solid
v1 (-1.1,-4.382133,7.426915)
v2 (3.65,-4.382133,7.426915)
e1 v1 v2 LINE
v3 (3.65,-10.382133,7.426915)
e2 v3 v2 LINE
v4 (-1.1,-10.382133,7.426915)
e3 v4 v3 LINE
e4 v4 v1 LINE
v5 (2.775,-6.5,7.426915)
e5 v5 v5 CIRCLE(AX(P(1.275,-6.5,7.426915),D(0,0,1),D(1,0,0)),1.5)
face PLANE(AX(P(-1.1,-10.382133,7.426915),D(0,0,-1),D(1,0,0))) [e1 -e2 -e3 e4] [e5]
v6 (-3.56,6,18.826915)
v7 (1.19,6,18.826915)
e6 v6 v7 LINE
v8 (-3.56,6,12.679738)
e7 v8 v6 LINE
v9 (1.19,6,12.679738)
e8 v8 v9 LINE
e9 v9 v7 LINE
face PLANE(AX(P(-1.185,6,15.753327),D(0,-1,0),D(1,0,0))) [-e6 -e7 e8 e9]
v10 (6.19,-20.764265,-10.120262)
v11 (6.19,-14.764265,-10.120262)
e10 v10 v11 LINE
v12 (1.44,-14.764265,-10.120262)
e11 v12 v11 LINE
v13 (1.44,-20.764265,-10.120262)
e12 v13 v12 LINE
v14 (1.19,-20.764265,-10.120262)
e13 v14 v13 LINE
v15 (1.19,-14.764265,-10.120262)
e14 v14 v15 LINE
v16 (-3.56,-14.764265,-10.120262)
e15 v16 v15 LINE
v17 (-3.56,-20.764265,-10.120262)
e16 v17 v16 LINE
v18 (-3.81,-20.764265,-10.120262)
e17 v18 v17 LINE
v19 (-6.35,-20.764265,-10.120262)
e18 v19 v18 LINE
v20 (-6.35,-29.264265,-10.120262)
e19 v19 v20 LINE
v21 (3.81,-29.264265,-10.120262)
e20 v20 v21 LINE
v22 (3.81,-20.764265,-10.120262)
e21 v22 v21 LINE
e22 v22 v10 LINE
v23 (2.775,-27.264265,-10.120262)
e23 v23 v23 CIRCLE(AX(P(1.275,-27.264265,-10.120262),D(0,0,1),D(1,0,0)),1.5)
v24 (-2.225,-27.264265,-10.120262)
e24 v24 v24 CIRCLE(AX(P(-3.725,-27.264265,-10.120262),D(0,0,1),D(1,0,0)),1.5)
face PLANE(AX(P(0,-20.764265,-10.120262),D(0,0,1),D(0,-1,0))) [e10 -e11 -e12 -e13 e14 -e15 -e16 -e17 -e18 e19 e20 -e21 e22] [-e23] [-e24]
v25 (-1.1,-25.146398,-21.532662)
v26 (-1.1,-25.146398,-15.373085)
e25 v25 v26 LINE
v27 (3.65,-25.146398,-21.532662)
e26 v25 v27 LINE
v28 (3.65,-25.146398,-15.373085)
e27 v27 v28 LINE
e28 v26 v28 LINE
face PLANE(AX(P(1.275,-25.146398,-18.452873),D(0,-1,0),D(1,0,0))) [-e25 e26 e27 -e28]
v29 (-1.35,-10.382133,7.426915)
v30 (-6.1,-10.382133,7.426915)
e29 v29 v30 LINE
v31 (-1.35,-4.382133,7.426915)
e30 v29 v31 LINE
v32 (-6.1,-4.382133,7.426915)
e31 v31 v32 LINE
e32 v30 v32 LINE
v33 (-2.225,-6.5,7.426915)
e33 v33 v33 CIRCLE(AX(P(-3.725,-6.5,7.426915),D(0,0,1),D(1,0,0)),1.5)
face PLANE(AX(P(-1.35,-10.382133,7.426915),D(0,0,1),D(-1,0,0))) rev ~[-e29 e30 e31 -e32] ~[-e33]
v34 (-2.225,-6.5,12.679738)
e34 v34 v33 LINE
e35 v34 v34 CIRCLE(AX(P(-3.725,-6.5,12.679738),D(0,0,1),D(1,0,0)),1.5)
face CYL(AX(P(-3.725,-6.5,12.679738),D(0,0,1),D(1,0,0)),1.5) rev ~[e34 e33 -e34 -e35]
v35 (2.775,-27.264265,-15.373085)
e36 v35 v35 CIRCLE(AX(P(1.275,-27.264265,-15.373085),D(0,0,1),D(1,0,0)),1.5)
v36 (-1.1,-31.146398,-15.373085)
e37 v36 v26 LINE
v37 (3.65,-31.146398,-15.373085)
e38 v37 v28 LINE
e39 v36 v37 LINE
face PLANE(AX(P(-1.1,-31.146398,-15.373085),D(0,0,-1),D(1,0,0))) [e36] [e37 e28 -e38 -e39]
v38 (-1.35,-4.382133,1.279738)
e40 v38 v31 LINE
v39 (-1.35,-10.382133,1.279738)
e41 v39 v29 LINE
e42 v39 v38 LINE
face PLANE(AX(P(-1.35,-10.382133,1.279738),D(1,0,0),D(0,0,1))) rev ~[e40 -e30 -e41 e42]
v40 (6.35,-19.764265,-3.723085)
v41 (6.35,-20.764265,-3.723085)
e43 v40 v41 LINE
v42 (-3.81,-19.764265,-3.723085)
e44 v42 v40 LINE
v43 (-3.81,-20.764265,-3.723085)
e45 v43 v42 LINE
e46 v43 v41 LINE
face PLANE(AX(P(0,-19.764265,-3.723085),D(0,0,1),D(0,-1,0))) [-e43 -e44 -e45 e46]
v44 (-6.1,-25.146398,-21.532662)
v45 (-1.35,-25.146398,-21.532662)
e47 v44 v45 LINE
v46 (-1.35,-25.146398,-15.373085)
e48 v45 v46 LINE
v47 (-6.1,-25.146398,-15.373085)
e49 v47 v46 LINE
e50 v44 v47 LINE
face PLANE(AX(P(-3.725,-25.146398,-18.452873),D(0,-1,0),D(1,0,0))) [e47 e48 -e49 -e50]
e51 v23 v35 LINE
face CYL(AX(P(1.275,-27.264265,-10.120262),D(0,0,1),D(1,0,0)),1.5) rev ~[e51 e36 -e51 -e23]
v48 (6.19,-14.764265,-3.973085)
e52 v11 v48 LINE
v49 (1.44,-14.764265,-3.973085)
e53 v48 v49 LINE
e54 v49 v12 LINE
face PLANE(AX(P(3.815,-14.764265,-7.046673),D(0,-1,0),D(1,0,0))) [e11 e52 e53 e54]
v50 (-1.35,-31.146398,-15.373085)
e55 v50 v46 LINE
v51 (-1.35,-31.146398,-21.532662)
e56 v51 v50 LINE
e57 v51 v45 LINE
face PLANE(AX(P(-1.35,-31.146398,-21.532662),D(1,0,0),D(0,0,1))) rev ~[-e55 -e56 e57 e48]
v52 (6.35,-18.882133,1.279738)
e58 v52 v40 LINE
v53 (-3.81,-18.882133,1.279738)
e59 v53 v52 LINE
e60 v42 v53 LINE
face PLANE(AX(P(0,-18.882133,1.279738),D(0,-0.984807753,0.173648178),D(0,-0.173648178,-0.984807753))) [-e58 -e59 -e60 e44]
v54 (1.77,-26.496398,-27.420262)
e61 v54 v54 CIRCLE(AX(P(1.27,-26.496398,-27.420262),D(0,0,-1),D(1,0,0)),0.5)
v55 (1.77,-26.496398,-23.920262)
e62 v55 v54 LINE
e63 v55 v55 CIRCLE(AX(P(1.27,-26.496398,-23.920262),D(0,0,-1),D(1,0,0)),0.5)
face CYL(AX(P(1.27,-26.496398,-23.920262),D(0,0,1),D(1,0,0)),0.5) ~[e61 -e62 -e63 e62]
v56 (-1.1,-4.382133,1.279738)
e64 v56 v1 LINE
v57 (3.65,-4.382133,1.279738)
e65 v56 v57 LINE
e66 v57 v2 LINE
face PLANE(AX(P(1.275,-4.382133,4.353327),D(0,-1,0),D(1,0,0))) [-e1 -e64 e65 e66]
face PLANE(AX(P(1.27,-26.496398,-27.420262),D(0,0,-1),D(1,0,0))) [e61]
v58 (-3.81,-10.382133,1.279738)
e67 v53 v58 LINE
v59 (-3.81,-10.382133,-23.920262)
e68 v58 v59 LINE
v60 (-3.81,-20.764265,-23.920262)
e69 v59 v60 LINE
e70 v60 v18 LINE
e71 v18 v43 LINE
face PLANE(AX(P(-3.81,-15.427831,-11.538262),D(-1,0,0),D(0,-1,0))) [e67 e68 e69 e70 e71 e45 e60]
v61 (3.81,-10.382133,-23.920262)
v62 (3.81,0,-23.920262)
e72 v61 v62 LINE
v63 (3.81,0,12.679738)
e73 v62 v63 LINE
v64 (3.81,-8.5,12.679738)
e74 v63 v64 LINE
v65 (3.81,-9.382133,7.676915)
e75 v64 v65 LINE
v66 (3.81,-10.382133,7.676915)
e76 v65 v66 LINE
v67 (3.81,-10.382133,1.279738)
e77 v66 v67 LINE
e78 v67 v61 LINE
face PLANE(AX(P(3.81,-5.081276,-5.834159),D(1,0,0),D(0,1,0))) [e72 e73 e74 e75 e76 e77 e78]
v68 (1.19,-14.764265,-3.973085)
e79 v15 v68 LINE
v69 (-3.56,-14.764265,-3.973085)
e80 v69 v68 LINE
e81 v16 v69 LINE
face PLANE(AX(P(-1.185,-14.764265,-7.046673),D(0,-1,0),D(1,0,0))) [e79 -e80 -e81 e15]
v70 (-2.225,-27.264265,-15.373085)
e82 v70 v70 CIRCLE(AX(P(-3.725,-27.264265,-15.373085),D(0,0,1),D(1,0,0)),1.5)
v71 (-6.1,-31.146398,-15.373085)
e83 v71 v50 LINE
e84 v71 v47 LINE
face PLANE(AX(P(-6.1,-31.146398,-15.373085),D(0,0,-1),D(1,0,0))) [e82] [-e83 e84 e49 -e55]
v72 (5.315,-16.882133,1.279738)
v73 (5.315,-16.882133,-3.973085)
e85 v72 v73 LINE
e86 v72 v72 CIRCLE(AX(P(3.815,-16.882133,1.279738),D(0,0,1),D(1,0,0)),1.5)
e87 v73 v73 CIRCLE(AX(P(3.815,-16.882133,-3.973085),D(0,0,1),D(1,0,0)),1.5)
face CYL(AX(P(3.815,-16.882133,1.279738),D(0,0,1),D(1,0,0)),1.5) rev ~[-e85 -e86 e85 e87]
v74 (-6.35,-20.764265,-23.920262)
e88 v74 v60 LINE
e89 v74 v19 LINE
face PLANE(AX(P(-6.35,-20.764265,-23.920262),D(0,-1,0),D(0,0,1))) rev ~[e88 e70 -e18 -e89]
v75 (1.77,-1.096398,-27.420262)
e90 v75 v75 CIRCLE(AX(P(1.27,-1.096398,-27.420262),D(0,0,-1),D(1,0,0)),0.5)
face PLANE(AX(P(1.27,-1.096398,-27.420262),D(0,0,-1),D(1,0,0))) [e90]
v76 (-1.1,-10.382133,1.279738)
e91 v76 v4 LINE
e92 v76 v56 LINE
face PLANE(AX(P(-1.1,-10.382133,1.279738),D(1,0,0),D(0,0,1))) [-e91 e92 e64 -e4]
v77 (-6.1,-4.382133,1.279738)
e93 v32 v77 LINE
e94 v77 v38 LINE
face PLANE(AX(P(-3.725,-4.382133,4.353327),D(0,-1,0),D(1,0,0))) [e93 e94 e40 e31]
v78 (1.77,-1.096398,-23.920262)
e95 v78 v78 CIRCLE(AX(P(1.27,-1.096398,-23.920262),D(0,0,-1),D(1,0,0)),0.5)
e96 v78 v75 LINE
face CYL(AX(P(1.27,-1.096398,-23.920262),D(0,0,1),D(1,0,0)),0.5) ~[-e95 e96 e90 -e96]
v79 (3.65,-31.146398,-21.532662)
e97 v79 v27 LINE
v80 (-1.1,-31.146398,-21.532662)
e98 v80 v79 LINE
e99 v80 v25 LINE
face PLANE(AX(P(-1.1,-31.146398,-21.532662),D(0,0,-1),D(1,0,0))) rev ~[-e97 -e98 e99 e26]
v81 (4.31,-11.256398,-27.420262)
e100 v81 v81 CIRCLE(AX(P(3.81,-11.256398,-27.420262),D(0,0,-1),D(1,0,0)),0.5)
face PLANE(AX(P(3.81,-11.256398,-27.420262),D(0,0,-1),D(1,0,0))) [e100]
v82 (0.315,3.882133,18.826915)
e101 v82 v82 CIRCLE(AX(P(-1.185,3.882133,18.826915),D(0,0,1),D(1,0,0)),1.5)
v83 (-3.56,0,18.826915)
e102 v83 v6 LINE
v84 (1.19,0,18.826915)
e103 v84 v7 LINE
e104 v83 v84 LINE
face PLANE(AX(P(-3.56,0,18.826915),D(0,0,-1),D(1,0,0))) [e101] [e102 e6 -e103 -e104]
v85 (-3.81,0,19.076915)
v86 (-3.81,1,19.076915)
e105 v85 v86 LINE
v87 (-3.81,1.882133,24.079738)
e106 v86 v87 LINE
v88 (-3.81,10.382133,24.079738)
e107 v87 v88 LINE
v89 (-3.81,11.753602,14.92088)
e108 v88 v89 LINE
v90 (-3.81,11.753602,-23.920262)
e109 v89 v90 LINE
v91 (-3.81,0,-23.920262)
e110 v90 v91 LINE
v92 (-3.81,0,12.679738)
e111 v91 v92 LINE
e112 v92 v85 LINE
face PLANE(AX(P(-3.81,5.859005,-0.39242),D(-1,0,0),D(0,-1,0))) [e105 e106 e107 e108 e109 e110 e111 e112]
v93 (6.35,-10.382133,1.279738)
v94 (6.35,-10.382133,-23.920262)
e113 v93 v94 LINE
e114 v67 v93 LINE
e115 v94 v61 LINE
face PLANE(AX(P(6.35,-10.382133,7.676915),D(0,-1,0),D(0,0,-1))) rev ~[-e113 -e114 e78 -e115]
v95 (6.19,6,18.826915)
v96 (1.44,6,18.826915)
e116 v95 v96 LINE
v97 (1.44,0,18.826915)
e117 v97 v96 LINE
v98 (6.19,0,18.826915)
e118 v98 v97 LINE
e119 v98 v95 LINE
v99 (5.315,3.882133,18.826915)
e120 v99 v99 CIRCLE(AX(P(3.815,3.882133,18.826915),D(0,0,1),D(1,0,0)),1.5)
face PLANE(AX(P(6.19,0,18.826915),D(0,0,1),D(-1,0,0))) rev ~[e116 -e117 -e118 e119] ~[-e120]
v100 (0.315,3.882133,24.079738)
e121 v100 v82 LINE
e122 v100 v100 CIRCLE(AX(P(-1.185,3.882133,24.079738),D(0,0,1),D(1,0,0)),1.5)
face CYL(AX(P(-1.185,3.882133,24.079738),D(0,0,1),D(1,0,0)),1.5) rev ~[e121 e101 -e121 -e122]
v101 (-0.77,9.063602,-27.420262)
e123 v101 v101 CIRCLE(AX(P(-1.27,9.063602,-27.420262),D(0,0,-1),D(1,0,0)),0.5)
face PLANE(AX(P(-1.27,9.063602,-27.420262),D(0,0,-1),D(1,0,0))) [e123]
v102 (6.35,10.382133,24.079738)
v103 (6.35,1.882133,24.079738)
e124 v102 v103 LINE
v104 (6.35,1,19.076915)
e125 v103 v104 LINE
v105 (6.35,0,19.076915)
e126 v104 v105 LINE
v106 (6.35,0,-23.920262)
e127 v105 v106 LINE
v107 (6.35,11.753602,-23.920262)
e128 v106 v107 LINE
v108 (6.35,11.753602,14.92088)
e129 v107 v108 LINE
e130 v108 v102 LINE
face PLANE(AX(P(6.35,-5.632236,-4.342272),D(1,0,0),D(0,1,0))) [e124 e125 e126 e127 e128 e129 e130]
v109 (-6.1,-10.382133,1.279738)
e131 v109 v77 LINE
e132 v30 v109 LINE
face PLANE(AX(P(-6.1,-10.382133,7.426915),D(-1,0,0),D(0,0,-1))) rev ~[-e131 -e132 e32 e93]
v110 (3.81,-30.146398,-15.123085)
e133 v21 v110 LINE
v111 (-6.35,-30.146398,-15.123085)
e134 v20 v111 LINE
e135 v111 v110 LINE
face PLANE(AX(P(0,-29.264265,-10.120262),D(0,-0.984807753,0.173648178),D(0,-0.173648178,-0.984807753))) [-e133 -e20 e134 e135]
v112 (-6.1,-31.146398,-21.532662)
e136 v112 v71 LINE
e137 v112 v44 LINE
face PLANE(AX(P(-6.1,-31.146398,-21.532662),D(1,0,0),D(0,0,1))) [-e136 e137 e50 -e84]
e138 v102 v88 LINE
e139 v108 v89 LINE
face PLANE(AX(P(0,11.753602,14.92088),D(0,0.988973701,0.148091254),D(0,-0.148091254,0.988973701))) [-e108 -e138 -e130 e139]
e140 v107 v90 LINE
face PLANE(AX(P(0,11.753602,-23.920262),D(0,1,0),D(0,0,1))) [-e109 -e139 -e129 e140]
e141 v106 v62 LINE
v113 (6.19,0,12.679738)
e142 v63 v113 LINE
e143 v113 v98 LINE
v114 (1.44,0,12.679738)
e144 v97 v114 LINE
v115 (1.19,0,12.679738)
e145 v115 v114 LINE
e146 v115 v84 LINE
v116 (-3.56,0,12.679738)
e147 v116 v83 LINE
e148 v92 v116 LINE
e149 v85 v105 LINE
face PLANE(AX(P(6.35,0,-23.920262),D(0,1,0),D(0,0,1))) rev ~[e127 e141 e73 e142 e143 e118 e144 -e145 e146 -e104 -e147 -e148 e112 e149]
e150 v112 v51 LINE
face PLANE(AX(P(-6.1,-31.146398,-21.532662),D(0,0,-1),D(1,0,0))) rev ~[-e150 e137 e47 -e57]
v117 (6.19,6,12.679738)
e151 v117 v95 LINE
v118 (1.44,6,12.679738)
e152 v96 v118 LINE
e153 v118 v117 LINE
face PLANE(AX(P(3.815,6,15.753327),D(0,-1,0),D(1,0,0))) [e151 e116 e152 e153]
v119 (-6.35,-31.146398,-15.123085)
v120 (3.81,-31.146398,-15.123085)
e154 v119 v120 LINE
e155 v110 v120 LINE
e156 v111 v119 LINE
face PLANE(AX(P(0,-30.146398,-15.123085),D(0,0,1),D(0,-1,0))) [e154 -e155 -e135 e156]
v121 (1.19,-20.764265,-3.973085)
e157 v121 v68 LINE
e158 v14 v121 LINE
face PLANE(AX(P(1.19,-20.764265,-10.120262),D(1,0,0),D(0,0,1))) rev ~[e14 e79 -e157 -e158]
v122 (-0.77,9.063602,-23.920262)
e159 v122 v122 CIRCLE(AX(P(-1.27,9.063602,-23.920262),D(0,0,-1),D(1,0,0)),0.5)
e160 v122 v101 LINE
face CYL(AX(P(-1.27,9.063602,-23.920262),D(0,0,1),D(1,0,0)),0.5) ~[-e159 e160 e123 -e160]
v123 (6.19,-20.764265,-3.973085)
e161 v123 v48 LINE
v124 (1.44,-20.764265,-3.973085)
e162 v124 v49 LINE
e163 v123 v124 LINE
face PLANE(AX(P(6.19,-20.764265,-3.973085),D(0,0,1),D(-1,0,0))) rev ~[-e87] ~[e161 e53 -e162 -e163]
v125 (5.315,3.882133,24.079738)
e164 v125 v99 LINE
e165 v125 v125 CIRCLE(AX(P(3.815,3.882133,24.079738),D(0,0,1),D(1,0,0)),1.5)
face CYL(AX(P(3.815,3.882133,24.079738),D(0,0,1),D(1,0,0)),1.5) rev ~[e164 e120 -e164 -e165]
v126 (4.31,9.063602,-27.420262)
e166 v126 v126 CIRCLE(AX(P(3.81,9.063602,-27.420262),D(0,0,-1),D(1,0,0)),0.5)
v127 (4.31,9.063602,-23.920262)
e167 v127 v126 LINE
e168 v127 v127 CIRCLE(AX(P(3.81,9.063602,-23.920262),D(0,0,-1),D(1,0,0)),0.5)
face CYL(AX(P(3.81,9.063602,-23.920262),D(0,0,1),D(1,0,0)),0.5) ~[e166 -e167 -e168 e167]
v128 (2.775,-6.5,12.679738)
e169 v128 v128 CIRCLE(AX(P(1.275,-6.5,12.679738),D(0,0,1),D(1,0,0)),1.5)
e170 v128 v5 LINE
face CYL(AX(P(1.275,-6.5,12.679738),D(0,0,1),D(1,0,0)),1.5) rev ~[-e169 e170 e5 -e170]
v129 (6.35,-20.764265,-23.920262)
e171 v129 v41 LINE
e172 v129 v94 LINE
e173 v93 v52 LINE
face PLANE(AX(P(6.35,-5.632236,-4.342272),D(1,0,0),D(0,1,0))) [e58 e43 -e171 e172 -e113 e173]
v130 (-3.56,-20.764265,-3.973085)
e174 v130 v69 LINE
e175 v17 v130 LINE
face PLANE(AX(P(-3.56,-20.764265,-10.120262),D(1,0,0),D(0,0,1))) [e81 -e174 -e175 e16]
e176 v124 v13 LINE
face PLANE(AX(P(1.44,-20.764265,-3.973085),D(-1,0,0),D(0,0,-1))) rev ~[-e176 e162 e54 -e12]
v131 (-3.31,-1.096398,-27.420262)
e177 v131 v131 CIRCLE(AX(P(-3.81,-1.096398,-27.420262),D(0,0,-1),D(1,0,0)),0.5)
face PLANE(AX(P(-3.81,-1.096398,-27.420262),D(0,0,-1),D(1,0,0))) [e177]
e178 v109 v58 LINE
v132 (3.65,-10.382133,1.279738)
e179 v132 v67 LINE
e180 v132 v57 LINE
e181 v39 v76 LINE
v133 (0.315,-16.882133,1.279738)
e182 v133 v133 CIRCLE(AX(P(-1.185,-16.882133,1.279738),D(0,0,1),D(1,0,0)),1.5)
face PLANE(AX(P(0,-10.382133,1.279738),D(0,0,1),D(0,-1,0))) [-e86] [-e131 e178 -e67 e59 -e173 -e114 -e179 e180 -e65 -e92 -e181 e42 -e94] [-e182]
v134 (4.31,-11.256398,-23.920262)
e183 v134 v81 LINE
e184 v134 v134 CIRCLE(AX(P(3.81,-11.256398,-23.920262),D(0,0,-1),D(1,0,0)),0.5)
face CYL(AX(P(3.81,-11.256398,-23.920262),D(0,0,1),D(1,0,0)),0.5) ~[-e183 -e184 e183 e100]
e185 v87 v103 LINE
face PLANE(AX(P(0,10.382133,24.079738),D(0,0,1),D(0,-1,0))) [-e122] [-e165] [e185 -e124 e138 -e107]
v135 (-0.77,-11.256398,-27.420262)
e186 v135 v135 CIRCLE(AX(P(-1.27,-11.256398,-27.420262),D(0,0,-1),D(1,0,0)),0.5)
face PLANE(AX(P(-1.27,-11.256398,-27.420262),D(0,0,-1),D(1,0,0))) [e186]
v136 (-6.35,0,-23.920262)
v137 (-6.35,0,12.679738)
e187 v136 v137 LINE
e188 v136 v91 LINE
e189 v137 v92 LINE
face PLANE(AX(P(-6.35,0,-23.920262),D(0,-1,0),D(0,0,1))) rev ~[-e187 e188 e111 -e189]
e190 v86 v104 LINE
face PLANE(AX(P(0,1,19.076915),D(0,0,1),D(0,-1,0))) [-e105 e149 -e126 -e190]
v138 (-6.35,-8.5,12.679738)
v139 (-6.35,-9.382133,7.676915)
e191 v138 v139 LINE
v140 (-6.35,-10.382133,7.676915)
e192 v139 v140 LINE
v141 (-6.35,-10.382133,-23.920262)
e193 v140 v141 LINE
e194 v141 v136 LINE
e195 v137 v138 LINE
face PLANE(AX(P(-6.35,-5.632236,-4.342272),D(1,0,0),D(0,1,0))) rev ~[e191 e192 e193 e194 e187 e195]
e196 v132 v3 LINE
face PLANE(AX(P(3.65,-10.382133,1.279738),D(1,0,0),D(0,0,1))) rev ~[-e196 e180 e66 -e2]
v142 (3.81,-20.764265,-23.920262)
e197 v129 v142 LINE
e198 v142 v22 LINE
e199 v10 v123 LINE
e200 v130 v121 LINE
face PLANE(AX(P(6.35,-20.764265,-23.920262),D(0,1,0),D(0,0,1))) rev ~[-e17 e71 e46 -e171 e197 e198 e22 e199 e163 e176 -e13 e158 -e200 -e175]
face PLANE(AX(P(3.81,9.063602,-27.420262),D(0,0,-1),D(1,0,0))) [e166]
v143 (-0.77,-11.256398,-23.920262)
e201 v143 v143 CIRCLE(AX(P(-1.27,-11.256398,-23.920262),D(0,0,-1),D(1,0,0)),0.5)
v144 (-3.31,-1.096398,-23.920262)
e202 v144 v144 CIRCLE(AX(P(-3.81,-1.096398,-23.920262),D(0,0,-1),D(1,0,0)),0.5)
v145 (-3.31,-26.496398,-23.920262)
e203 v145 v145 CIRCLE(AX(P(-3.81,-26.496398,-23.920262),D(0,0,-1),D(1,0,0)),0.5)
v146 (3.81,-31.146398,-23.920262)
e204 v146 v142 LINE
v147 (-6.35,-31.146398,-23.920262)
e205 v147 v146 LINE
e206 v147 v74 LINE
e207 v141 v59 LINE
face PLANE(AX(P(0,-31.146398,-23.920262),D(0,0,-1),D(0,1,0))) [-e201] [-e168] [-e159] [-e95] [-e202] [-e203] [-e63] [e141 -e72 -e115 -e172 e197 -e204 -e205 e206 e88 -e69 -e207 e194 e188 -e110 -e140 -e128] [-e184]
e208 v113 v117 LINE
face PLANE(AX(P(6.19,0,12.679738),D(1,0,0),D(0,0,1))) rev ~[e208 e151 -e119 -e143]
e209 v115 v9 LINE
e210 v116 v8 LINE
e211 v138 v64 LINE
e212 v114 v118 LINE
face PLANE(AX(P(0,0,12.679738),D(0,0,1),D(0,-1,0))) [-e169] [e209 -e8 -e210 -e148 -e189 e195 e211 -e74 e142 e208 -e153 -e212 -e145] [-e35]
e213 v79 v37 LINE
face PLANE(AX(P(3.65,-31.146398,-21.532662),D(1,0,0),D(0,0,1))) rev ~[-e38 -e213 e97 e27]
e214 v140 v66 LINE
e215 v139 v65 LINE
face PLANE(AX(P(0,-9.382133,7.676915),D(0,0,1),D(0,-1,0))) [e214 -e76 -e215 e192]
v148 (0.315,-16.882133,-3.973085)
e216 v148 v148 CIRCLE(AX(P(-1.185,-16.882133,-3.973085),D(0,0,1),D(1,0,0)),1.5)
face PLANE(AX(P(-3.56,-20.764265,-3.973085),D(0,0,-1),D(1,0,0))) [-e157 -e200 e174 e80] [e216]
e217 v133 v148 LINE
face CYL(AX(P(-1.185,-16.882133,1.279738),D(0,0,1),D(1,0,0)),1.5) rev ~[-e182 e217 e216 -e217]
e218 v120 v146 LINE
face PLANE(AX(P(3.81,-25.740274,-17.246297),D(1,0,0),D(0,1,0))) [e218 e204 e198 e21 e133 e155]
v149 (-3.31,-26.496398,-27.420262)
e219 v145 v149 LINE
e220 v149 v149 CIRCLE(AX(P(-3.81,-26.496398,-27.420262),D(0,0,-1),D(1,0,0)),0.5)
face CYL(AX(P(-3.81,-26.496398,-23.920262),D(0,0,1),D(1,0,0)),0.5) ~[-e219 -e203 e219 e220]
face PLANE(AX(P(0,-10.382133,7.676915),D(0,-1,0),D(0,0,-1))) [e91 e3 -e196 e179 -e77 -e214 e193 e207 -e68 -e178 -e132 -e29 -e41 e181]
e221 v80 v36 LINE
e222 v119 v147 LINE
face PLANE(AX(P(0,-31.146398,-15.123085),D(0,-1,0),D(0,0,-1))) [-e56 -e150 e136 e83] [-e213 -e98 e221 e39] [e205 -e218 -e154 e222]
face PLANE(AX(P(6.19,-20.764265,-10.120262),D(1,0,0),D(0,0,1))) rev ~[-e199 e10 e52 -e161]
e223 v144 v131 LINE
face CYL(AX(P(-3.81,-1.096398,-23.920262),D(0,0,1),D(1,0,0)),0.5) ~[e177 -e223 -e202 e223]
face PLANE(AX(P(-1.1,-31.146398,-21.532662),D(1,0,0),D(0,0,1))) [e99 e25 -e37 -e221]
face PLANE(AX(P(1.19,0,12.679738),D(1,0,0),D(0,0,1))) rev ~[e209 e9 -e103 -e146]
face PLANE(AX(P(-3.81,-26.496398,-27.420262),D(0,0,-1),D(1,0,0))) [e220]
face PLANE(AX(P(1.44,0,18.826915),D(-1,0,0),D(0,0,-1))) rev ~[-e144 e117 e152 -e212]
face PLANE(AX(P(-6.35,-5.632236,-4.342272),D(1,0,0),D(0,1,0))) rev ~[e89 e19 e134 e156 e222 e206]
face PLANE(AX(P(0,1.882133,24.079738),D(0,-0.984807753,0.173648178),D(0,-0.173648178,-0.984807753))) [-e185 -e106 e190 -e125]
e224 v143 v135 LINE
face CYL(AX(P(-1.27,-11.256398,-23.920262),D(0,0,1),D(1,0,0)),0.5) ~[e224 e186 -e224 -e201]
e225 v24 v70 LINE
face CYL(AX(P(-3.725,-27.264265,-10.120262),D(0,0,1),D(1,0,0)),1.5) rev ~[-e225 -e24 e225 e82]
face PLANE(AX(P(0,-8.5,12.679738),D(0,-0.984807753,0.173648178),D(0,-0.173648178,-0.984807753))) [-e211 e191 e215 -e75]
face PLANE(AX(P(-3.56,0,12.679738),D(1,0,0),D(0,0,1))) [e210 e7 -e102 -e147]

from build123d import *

# Parameters (mm, degrees)
F1_DEPTH  = 6.35
F3_DEPTH  = 2.54
F5_DEPTH  = 2.54
F6_W      = 4.75
F6_H      = 6.1595766147
F8_W      = 4.75
F8_H      = 6.1471766147
F7_W      = 4.75
F7_H      = 6.1471766147
F9_W      = 4.75
F9_H      = 6.1471766147
F10_DEPTH = 6
F11_R     = 1.5
F12_R     = 1.5
F13_R     = 1.5
F14_R     = 1.5
F15_DEPTH = 6
F16_R     = 0.5
F17_DEPTH = 3.5


# Not quite as in the source:
# - a feature names something its author has since deleted; it is built from what else it names


with BuildPart() as f1:
    # F0 (on Right) → F1 (new body, symmetric)
    with BuildSketch(Plane.YZ):
        Polygon((10.3821327425, 24.0797383321), (1.8821327425, 24.0797383321), (1, 19.0769149468), (0, 19.0769149468), (0, 12.6797383321), (-8.5, 12.6797383321), (-9.3821327425, 7.6769149468), (-10.3821327425, 7.6769149468), (-10.3821327425, 1.2797383321), (-18.8821327425, 1.2797383321), (-19.7642654851, -3.7230850532), (-20.7642654851, -3.7230850532), (-20.7642654851, -10.1202616679), (-29.2642654851, -10.1202616679), (-30.1463982276, -15.1230850532), (-31.1463982276, -15.1230850532), (-31.1463982276, -23.9202616679), (11.7536017724, -23.9202616679), (11.7536017724, 14.9208800867), align=None)
    extrude(amount=F1_DEPTH, both=True)

    # F2 (on face) → F3 (cut)
    with BuildSketch(Plane(origin=(-6.35, 0, 0), x_dir=(0, -1, 0), z_dir=(-1, 0, 0))):
        Polygon((-11.7536017724, -23.9202616679), (0, -23.9202616679), (0, 12.6797383321), (0, 19.0769149468), (-1, 19.0769149468), (-1.8821327425, 24.0797383321), (-10.3821327425, 24.0797383321), (-11.7536017724, 14.9208800867), align=None)
        Polygon((20.7642654851, -23.9202616679), (20.7642654851, -10.1202616679), (20.7642654851, -3.7230850532), (19.7642654851, -3.7230850532), (18.8821327425, 1.2797383321), (10.3821327425, 1.2797383321), (10.3821327425, -23.9202616679), align=None)
    extrude(amount=-F3_DEPTH, mode=Mode.SUBTRACT)

    # F4 (on face) → F5 (cut)
    with BuildSketch(Plane.YZ.offset(6.35)):
        Polygon((-20.7642654851, -23.9202616679), (-20.7642654851, -10.1202616679), (-29.2642654851, -10.1202616679), (-30.1463982276, -15.1230850532), (-31.1463982276, -15.1230850532), (-31.1463982276, -23.9202616679), align=None)
        Polygon((-10.3821327425, 1.2797383321), (-10.3821327425, -23.9202616679), (0, -23.9202616679), (0, 12.6797383321), (-8.5, 12.6797383321), (-9.3821327425, 7.6769149468), (-10.3821327425, 7.6769149468), align=None)
    extrude(amount=-F5_DEPTH, mode=Mode.SUBTRACT)

    # F6 (on face) + F8 (on face) + F7 (on face) + F9 (on face) → F10 (cut)
    with BuildSketch(Plane.XZ.offset(31.1463982276)):
        with Locations((-3.725, -18.4528733606)):
            Rectangle(F6_W, F6_H)
        with Locations((1.275, -18.4528733606)):
            Rectangle(F6_W, F6_H)
        with Locations((6.275, -18.4528733606)):
            Rectangle(F6_W, F6_H)
    with BuildSketch(Plane.XZ.offset(10.3821327425)):
        Polygon((-6.1, 7.4269149468), (-6.1, 1.2797383321), (-3.81, 1.2797383321), (-1.35, 1.2797383321), (-1.35, 7.4269149468), align=None)
        with Locations((1.275, 4.3533266394)):
            Rectangle(F8_W, F8_H)
        with Locations((6.275, 4.3533266394)):
            Rectangle(F8_W, F8_H)
    with BuildSketch(Plane.XZ.offset(20.7642654851)):
        with Locations((-1.185, -7.0466733606)):
            Rectangle(F7_W, F7_H)
        Polygon((1.44, -3.9730850532), (1.44, -10.1202616679), (3.81, -10.1202616679), (6.19, -10.1202616679), (6.19, -3.9730850532), align=None)
        with Locations((8.815, -7.0466733606)):
            Rectangle(F7_W, F7_H)
    with BuildSketch(Plane.XZ):
        with Locations((-1.185, 15.7533266394)):
            Rectangle(F9_W, F9_H)
        Polygon((1.44, 18.8269149468), (1.44, 12.6797383321), (3.81, 12.6797383321), (6.19, 12.6797383321), (6.19, 18.8269149468), align=None)
        with Locations((8.815, 15.7533266394)):
            Rectangle(F9_W, F9_H)
    extrude(amount=-F10_DEPTH, mode=Mode.SUBTRACT)

    # F11 (on face) + F12 (on face) + F13 (on face) + F14 (on face) → F15 (cut)
    with BuildSketch(Plane.XY.offset(-10.1202616679)):
        with Locations((-3.725, -27.2642654851)):
            Circle(F11_R)
        with Locations((1.275, -27.2642654851)):
            Circle(F11_R)
        with Locations((6.275, -27.2642654851)):
            Circle(F11_R)
    with BuildSketch(Plane.XY.offset(1.2797383321)):
        with Locations((-1.185, -16.8821327425)):
            Circle(F12_R)
        with Locations((3.815, -16.8821327425)):
            Circle(F12_R)
        with Locations((8.815, -16.8821327425)):
            Circle(F12_R)
    with BuildSketch(Plane.XY.offset(12.6797383321)):
        with Locations((-3.725, -6.5)):
            Circle(F13_R)
        with Locations((1.275, -6.5)):
            Circle(F13_R)
        with Locations((6.275, -6.5)):
            Circle(F13_R)
    with BuildSketch(Plane.XY.offset(24.0797383321)):
        with Locations((-1.185, 3.8821327425)):
            Circle(F14_R)
        with Locations((3.815, 3.8821327425)):
            Circle(F14_R)
        with Locations((8.815, 3.8821327425)):
            Circle(F14_R)
    extrude(amount=-F15_DEPTH, mode=Mode.SUBTRACT)

    # F16 (on face) → F17 (join)
    with BuildSketch(Plane(origin=(0, 0, -23.9202616679), x_dir=(1, 0, 0), z_dir=(0, 0, -1))):
        with Locations((1.27, 26.4963982276)):
            Circle(F16_R)
        with Locations((-3.81, 26.4963982276)):
            Circle(F16_R)
        with Locations((3.81, 11.2563982276)):
            Circle(F16_R)
        with Locations((-1.27, 11.2563982276)):
            Circle(F16_R)
        with Locations((-3.81, 1.0963982276)):
            Circle(F16_R)
        with Locations((1.27, 1.0963982276)):
            Circle(F16_R)
        with Locations((3.81, -9.0636017724)):
            Circle(F16_R)
        with Locations((-1.27, -9.0636017724)):
            Circle(F16_R)
    extrude(amount=F17_DEPTH)


solid = f1.part
